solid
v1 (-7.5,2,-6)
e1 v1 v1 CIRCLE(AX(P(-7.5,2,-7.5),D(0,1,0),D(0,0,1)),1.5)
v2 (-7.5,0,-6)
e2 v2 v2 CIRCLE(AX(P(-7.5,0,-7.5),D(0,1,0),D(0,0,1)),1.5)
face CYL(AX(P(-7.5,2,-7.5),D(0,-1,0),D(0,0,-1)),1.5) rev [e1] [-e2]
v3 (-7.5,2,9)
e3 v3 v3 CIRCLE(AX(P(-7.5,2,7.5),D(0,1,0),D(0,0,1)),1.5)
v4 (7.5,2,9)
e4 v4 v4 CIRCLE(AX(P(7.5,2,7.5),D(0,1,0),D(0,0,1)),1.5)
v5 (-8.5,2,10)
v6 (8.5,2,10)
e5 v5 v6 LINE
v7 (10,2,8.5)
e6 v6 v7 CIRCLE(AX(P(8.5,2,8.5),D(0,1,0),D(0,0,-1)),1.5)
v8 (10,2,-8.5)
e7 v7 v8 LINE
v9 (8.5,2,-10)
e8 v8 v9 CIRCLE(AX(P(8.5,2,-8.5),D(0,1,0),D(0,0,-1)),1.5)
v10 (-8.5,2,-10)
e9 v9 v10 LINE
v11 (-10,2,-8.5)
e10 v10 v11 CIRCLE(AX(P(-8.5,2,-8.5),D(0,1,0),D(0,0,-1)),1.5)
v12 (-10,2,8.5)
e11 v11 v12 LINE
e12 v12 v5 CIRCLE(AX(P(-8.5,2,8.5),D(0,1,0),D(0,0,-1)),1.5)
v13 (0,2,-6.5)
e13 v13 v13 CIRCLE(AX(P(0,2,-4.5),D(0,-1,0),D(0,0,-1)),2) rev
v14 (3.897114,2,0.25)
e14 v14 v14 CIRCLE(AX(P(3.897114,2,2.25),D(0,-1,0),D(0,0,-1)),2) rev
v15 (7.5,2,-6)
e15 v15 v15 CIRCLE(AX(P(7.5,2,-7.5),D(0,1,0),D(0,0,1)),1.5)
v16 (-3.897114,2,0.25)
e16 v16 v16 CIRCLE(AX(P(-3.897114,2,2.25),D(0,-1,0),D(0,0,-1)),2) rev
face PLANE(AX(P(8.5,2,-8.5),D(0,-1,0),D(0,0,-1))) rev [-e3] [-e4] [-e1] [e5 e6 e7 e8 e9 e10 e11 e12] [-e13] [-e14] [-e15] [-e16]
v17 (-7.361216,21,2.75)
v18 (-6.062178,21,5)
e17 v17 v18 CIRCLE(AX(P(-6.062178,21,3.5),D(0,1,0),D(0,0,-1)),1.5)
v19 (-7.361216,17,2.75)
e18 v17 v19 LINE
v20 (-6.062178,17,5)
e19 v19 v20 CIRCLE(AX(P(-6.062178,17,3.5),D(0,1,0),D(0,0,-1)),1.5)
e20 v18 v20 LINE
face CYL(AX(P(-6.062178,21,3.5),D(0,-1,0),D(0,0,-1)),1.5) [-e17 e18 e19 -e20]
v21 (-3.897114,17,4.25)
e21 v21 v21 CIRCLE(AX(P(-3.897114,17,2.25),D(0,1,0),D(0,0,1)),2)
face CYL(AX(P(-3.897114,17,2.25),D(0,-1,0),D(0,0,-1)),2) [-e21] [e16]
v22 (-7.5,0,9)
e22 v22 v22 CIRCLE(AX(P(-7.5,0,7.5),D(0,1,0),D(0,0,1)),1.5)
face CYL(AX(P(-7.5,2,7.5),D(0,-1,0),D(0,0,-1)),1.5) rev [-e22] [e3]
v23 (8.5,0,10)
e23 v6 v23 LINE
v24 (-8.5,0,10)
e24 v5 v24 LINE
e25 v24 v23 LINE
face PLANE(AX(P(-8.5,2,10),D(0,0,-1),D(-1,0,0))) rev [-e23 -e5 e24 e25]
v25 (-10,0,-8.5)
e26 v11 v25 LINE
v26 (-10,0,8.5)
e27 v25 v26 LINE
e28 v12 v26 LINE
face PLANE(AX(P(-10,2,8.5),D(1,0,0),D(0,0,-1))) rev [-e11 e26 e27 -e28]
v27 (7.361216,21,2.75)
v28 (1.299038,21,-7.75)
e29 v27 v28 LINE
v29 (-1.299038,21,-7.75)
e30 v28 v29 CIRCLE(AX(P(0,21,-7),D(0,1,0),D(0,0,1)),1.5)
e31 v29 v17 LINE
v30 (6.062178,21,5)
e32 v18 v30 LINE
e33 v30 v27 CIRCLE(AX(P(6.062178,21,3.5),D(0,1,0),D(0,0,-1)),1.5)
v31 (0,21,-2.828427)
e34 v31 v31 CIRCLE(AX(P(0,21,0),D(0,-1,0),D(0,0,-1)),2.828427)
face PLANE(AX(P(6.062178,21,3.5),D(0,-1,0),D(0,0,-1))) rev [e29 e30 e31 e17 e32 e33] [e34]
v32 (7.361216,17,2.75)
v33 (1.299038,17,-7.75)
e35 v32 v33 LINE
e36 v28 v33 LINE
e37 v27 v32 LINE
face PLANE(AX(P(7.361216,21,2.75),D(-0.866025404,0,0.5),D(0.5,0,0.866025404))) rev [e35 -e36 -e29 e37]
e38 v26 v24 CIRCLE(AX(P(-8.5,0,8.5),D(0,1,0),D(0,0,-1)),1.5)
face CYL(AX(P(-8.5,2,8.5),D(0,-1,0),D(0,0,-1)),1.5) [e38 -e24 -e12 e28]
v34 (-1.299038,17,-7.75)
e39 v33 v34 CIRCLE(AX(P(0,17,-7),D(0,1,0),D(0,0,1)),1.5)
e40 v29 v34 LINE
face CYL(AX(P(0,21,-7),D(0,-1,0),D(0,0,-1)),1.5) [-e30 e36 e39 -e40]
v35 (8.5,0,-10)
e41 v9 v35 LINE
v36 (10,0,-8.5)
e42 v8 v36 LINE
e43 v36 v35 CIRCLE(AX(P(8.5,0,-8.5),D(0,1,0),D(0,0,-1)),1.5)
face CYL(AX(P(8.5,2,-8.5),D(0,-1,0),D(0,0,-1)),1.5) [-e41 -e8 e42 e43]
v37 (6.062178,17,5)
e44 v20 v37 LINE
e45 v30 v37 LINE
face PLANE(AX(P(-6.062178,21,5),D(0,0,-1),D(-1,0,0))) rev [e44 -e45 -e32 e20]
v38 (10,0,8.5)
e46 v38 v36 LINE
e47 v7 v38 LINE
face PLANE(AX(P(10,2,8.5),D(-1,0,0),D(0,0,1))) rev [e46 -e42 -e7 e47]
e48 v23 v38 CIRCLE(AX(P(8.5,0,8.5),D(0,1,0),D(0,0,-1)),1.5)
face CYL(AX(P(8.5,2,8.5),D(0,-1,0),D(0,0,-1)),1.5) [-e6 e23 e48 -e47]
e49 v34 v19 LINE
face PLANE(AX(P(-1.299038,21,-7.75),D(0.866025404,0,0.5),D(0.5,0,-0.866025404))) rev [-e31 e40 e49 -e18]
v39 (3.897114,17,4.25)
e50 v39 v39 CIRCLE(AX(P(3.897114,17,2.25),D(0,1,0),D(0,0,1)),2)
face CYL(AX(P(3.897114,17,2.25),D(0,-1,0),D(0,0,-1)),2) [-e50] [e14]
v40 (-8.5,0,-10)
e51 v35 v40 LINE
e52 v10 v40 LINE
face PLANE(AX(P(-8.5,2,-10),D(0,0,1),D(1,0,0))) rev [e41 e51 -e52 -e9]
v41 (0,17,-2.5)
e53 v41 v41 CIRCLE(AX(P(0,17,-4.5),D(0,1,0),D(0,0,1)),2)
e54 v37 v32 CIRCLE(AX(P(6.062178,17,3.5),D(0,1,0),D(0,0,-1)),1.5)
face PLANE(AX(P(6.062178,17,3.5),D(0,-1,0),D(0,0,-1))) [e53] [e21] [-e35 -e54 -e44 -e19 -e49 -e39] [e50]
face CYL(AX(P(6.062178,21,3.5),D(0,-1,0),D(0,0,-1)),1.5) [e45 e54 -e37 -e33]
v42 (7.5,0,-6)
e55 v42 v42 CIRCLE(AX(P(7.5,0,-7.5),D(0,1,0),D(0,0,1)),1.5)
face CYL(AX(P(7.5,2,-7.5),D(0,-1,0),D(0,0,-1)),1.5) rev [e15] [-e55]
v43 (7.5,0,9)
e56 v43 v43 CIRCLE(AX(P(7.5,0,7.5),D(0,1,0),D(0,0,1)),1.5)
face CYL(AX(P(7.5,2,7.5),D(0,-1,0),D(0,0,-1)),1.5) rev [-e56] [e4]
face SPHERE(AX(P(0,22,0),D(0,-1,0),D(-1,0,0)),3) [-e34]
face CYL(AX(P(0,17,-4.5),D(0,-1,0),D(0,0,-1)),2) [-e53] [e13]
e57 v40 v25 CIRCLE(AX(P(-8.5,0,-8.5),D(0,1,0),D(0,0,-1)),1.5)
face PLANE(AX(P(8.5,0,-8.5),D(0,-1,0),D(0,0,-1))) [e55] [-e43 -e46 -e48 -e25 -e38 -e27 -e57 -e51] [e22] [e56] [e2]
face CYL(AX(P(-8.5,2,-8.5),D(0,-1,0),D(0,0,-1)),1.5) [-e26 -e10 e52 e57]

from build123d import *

# Parameters (mm, degrees)
SKETCH_1_R      = 1.5
EXTRUDE_1_DEPTH = 2
SKETCH_2_R      = 2
EXTRUDE_2_DEPTH = 15
EXTRUDE_3_DEPTH = 4


with BuildPart() as part:
    # 草图1 → 凸台-拉伸1 (new body)
    with BuildSketch(Plane(origin=(0, 0, 0), x_dir=(1, 0, 0), z_dir=(0, 1, 0))):
        with BuildLine():
            Line((-8.5, -10), (8.5, -10))
            ThreePointArc((8.5, -10), (9.560660172, -9.560660172), (10, -8.5))
            Line((10, -8.5), (10, 8.5))
            ThreePointArc((10, 8.5), (9.560660172, 9.560660172), (8.5, 10))
            Line((8.5, 10), (-8.5, 10))
            ThreePointArc((-8.5, 10), (-9.560660172, 9.560660172), (-10, 8.5))
            Line((-10, 8.5), (-10, -8.5))
            ThreePointArc((-10, -8.5), (-9.560660172, -9.560660172), (-8.5, -10))
        make_face()
        with Locations((7.5, 7.5)):
            Circle(SKETCH_1_R, mode=Mode.SUBTRACT)
        with Locations((-7.5, 7.5)):
            Circle(SKETCH_1_R, mode=Mode.SUBTRACT)
        with Locations((-7.5, -7.5)):
            Circle(SKETCH_1_R, mode=Mode.SUBTRACT)
        with Locations((7.5, -7.5)):
            Circle(SKETCH_1_R, mode=Mode.SUBTRACT)
    extrude(amount=EXTRUDE_1_DEPTH)

    # 草图2 → 凸台-拉伸2 (add)
    with BuildSketch(Plane(origin=(0, 2, 0), x_dir=(1, 0, 0), z_dir=(0, 1, 0))):
        with Locations((0, 4.5)):
            Circle(SKETCH_2_R)
        with Locations((3.897114317, -2.25)):
            Circle(SKETCH_2_R)
        with Locations((-3.897114317, -2.25)):
            Circle(SKETCH_2_R)
    extrude(amount=EXTRUDE_2_DEPTH)

    # 草图4 → 凸台-拉伸3 (add)
    with BuildSketch(Plane(origin=(0, 17, 0), x_dir=(1, 0, 0), z_dir=(0, 1, 0))):
        with BuildLine():
            Line((-1.299038106, 7.75), (-7.361215932, -2.75))
            ThreePointArc((-7.361215932, -2.75), (-7.361215932, -4.25), (-6.062177826, -5))
            Line((-6.062177826, -5), (6.062177826, -5))
            ThreePointArc((6.062177826, -5), (7.361215932, -4.25), (7.361215932, -2.75))
            Line((7.361215932, -2.75), (1.299038106, 7.75))
            ThreePointArc((1.299038106, 7.75), (0, 8.5), (-1.299038106, 7.75))
        make_face()
    extrude(amount=EXTRUDE_3_DEPTH)

    # 草图7 → 旋转4 (revolve)
    with BuildSketch(Plane.XY):
        with BuildLine():
            Line((0, 25), (0, 19))
            ThreePointArc((0, 19), (2.121320344, 19.878679656), (3, 22))
            ThreePointArc((3, 22), (2.121320344, 24.121320344), (0, 25))
        make_face()
    revolve(axis=Axis((0, 19, 0), (0, 1, 0)))


solid = part.part
